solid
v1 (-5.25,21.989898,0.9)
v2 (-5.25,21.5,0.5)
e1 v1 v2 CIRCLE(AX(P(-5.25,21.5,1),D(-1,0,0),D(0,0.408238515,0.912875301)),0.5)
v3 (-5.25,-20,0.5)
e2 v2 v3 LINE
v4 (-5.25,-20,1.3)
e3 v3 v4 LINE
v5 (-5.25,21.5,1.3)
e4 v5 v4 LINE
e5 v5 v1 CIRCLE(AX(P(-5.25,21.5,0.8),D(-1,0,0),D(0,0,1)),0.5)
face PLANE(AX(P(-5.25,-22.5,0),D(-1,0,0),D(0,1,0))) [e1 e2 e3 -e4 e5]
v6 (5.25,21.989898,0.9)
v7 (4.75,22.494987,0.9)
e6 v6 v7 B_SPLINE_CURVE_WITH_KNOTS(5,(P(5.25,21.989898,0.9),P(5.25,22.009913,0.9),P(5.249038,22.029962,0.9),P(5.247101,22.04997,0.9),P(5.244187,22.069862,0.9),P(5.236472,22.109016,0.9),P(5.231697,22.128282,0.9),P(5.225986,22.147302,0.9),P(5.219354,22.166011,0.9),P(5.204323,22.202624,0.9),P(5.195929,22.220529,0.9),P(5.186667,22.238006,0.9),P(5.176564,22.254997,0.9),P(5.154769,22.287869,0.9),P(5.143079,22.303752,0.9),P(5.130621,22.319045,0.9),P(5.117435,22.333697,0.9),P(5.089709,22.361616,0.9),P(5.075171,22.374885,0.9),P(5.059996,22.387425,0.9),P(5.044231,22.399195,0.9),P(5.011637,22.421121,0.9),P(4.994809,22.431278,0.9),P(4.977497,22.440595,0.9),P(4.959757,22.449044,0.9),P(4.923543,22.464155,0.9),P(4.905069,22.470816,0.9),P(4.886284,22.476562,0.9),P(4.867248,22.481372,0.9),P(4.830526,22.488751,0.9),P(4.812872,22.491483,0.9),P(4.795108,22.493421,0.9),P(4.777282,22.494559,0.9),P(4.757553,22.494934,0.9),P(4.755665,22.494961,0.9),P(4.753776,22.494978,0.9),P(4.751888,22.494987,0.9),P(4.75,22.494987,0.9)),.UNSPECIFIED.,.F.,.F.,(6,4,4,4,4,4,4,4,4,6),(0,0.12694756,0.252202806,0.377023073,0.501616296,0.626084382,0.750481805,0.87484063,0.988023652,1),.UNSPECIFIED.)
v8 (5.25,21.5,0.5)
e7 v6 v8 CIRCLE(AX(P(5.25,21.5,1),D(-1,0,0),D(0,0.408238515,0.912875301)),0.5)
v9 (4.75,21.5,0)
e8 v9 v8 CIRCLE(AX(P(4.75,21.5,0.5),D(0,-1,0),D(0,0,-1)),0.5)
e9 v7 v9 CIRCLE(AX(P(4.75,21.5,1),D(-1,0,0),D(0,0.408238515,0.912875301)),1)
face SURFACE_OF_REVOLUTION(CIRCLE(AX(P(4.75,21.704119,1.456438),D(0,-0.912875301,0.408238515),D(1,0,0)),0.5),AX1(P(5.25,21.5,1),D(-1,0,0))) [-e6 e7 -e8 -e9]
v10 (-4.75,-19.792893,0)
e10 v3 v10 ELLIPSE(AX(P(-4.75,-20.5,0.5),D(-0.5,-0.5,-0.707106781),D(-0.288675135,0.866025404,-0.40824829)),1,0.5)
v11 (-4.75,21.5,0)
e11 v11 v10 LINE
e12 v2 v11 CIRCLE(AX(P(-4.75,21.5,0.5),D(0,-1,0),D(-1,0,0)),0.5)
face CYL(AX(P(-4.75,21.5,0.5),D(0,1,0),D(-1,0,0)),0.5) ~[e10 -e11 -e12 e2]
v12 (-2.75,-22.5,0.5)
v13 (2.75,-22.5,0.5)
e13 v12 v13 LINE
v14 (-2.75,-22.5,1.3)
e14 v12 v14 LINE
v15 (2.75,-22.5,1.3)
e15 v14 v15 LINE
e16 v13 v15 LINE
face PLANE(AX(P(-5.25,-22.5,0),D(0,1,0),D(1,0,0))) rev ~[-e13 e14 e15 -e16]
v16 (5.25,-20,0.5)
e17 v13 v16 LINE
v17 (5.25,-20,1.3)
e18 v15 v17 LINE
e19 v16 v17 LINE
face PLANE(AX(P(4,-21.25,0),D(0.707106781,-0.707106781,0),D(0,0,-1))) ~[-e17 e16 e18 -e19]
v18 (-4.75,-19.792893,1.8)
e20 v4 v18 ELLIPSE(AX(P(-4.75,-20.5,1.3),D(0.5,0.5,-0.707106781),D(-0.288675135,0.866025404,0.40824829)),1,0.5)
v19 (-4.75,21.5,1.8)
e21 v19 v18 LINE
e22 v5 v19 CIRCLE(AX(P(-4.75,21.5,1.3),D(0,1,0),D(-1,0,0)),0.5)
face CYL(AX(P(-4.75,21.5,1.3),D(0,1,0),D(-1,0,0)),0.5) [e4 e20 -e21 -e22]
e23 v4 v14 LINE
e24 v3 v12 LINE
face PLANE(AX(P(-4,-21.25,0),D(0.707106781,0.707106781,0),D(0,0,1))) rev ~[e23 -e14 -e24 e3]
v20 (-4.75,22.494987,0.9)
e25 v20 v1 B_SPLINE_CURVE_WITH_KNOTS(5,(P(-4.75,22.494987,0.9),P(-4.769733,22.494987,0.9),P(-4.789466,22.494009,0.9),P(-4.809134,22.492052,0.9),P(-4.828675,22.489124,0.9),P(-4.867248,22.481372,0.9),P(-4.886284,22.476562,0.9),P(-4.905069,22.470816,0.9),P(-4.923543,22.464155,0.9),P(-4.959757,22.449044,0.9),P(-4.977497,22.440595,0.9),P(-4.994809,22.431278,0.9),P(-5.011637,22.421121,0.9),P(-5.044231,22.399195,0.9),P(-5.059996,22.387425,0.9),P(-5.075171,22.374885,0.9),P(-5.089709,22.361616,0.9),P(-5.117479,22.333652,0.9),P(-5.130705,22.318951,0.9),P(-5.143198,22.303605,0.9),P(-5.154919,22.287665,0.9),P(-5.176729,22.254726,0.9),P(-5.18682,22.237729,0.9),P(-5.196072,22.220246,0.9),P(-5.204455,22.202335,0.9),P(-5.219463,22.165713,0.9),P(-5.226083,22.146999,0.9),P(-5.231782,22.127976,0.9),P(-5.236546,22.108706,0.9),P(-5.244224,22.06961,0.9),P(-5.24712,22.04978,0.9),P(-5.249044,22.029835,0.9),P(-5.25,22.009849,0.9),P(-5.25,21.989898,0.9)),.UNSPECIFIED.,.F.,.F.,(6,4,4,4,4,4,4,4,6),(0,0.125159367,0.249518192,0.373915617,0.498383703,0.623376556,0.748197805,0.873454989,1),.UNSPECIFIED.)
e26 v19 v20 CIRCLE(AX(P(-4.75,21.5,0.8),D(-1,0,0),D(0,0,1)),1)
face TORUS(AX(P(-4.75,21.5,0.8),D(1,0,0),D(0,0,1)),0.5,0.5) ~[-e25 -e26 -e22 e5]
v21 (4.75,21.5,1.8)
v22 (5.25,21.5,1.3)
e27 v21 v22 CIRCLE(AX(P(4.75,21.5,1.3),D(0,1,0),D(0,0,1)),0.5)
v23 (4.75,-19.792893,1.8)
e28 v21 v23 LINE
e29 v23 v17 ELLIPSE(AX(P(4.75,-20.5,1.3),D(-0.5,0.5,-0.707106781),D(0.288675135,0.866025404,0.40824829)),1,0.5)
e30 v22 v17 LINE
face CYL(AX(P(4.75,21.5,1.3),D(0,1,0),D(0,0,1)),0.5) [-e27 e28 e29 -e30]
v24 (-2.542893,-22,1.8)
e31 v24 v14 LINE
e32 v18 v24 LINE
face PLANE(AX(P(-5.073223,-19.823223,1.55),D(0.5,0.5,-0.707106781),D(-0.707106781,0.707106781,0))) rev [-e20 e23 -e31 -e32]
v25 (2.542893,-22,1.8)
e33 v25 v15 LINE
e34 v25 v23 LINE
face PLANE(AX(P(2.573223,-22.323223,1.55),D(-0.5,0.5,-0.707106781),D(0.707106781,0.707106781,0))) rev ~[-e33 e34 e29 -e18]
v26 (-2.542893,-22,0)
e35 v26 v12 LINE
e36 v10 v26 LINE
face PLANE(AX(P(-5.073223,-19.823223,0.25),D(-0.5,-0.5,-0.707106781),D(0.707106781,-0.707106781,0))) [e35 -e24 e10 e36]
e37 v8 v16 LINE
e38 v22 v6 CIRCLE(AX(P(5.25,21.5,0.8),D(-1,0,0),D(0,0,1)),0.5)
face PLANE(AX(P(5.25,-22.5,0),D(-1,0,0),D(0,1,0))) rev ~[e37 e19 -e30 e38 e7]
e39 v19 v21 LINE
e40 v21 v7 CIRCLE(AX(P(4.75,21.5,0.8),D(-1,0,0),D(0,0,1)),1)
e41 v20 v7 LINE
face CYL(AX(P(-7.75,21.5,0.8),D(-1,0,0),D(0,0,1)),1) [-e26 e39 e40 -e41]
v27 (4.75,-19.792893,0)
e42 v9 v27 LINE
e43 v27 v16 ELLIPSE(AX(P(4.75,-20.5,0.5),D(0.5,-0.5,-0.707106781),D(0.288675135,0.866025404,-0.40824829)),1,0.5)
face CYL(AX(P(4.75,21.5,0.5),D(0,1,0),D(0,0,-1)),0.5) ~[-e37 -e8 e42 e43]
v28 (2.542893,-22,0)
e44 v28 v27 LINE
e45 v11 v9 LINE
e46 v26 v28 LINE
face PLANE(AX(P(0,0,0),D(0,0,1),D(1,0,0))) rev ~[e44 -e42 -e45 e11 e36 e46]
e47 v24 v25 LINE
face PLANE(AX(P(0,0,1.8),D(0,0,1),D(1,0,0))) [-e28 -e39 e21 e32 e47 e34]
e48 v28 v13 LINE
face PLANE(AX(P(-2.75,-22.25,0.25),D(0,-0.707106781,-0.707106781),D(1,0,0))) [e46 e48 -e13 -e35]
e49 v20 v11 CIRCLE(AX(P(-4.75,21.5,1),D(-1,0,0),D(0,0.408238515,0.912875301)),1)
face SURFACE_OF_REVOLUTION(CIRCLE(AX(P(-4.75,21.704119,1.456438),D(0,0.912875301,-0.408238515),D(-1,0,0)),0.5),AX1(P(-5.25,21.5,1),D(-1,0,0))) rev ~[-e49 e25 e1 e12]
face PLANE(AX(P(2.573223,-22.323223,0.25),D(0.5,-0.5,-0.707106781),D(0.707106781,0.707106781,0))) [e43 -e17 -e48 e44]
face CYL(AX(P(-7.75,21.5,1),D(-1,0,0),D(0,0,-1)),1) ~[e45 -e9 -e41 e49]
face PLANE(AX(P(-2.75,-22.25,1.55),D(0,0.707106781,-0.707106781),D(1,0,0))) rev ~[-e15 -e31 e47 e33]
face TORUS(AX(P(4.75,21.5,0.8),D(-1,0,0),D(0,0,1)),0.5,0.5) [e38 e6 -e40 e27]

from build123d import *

# Parameters (mm, degrees)
F0_W         = 10.5
F0_H         = 45
F1_DEPTH     = 1.8
F2_SIZE      = 2.5
F3_SIZE      = 0.5
F4_T1_DEPTH  = 15.5
F5_T1_DEPTH  = 42.0428932188
F5_T4_ANGLE  = 155.9057709944
F5_T6_ANGLE  = 155.9057709944
F5_T8_ANGLE  = 155.9057709944
F5_T10_ANGLE = 155.9057709944


# Not quite as in the source:
# - a fillet or chamfer that OpenCascade refuses, or shapes differently, is made with other operations: its cross-section is extruded or revolved along the edge and cut away or added


with BuildPart() as f1:
    # F0 (on Top) → F1 (new body)
    with BuildSketch(Plane.XY):
        Rectangle(F0_W, F0_H)
    extrude(amount=F1_DEPTH)

    # F2
    f2_edges = [f1.edges().sort_by_distance(p)[0] for p in [
        (5.25, -22.5, 0.9),
        (-5.25, -22.5, 0.9),
    ]]
    chamfer(f2_edges, length=F2_SIZE)

    # F3
    f3_edges = [f1.edges().sort_by_distance(p)[0] for p in [
        (0, -22.5, 1.8),
        (4, -21.25, 1.8),
        (4, -21.25, 0),
        (0, -22.5, 0),
        (-4, -21.25, 1.8),
        (-4, -21.25, 0),
    ]]
    chamfer(f3_edges, length=F3_SIZE)

    # F4: fillet of radius 1 on 2 edges, made by hand

    # F4_s2 → F4_t1 (cut)
    with BuildSketch(Plane.YZ.offset(-7.75)):
        with BuildLine():
            ThreePointArc((21.5, 0), (22.2071067812, 0.2928932188), (22.5, 1))
            Line((22.5, 1), (22.5, 0))
            Line((22.5, 0), (21.5, 0))
        make_face()
        with BuildLine():
            ThreePointArc((21.5, 1.8), (22.2071067812, 1.5071067812), (22.5, 0.8))
            Line((22.5, 0.8), (22.5, 1.8))
            Line((22.5, 1.8), (21.5, 1.8))
        make_face()
    extrude(amount=F4_T1_DEPTH, mode=Mode.SUBTRACT)

    # F5: fillet of radius 0.5 on 8 edges, made by hand

    # F5_s2 → F5_t1 (cut)
    with BuildSketch(Plane.XZ.offset(-21.5)):
        with BuildLine():
            ThreePointArc((4.75, 1.8), (5.1035533906, 1.6535533906), (5.25, 1.3))
            Line((5.25, 1.3), (5.25, 1.8))
            Line((5.25, 1.8), (4.75, 1.8))
        make_face()
        with BuildLine():
            ThreePointArc((4.75, 0), (5.1035533906, 0.1464466094), (5.25, 0.5))
            Line((5.25, 0.5), (5.25, 0))
            Line((5.25, 0), (4.75, 0))
        make_face()
        with BuildLine():
            ThreePointArc((-5.25, 1.3), (-5.1035533906, 1.6535533906), (-4.75, 1.8))
            Line((-4.75, 1.8), (-5.25, 1.8))
            Line((-5.25, 1.8), (-5.25, 1.3))
        make_face()
        with BuildLine():
            ThreePointArc((-5.25, 0.5), (-5.1035533906, 0.1464466094), (-4.75, 0))
            Line((-4.75, 0), (-5.25, 0))
            Line((-5.25, 0), (-5.25, 0.5))
        make_face()
    extrude(amount=F5_T1_DEPTH, mode=Mode.SUBTRACT)

    # F5_s3 → F5_t4 (revolve, cut)
    with BuildSketch(Plane.XZ.offset(-21.5)):
        with BuildLine():
            ThreePointArc((-5.25, 1.3), (-5.1035533906, 1.6535533906), (-4.75, 1.8))
            Line((-4.75, 1.8), (-5.25, 1.8))
            Line((-5.25, 1.8), (-5.25, 1.3))
        make_face()
    revolve(axis=Axis((-5.25, 21.5, 0.8), (-1, 0, 0)), revolution_arc=F5_T4_ANGLE, mode=Mode.SUBTRACT)

    # F5_s5 → F5_t6 (revolve, cut)
    with BuildSketch(Plane(origin=(0, 17.5441674109, -7.8457647459), x_dir=(1, 0, 0), z_dir=(0, -0.9128753008, 0.4082385151))):
        with BuildLine():
            ThreePointArc((-5.25, 10.1900033752), (-5.1035533906, 10.5435567657), (-4.75, 10.6900033752))
            Line((-4.75, 10.6900033752), (-5.25, 10.6900033752))
            Line((-5.25, 10.6900033752), (-5.25, 10.1900033752))
        make_face()
    revolve(axis=Axis((-5.25, 21.5, 1), (-1, 0, 0)), revolution_arc=F5_T6_ANGLE, mode=Mode.SUBTRACT)

    # F5_s7 → F5_t8 (revolve, cut)
    with BuildSketch(Plane(origin=(0, 17.5441674109, -7.8457647459), x_dir=(1, 0, 0), z_dir=(0, -0.9128753008, 0.4082385151))):
        with BuildLine():
            ThreePointArc((5.25, 10.1900033752), (5.1035533906, 10.5435567657), (4.75, 10.6900033752))
            Line((4.75, 10.6900033752), (5.25, 10.6900033752))
            Line((5.25, 10.6900033752), (5.25, 10.1900033752))
        make_face()
    revolve(axis=Axis((5.25, 21.5, 1), (-1, 0, 0)), revolution_arc=F5_T8_ANGLE, mode=Mode.SUBTRACT)

    # F5_s9 → F5_t10 (revolve, cut)
    with BuildSketch(Plane.XZ.offset(-21.5)):
        with BuildLine():
            ThreePointArc((5.25, 1.3), (5.1035533906, 1.6535533906), (4.75, 1.8))
            Line((4.75, 1.8), (5.25, 1.8))
            Line((5.25, 1.8), (5.25, 1.3))
        make_face()
    revolve(axis=Axis((5.25, 21.5, 0.8), (-1, 0, 0)), revolution_arc=F5_T10_ANGLE, mode=Mode.SUBTRACT)


solid = f1.part
